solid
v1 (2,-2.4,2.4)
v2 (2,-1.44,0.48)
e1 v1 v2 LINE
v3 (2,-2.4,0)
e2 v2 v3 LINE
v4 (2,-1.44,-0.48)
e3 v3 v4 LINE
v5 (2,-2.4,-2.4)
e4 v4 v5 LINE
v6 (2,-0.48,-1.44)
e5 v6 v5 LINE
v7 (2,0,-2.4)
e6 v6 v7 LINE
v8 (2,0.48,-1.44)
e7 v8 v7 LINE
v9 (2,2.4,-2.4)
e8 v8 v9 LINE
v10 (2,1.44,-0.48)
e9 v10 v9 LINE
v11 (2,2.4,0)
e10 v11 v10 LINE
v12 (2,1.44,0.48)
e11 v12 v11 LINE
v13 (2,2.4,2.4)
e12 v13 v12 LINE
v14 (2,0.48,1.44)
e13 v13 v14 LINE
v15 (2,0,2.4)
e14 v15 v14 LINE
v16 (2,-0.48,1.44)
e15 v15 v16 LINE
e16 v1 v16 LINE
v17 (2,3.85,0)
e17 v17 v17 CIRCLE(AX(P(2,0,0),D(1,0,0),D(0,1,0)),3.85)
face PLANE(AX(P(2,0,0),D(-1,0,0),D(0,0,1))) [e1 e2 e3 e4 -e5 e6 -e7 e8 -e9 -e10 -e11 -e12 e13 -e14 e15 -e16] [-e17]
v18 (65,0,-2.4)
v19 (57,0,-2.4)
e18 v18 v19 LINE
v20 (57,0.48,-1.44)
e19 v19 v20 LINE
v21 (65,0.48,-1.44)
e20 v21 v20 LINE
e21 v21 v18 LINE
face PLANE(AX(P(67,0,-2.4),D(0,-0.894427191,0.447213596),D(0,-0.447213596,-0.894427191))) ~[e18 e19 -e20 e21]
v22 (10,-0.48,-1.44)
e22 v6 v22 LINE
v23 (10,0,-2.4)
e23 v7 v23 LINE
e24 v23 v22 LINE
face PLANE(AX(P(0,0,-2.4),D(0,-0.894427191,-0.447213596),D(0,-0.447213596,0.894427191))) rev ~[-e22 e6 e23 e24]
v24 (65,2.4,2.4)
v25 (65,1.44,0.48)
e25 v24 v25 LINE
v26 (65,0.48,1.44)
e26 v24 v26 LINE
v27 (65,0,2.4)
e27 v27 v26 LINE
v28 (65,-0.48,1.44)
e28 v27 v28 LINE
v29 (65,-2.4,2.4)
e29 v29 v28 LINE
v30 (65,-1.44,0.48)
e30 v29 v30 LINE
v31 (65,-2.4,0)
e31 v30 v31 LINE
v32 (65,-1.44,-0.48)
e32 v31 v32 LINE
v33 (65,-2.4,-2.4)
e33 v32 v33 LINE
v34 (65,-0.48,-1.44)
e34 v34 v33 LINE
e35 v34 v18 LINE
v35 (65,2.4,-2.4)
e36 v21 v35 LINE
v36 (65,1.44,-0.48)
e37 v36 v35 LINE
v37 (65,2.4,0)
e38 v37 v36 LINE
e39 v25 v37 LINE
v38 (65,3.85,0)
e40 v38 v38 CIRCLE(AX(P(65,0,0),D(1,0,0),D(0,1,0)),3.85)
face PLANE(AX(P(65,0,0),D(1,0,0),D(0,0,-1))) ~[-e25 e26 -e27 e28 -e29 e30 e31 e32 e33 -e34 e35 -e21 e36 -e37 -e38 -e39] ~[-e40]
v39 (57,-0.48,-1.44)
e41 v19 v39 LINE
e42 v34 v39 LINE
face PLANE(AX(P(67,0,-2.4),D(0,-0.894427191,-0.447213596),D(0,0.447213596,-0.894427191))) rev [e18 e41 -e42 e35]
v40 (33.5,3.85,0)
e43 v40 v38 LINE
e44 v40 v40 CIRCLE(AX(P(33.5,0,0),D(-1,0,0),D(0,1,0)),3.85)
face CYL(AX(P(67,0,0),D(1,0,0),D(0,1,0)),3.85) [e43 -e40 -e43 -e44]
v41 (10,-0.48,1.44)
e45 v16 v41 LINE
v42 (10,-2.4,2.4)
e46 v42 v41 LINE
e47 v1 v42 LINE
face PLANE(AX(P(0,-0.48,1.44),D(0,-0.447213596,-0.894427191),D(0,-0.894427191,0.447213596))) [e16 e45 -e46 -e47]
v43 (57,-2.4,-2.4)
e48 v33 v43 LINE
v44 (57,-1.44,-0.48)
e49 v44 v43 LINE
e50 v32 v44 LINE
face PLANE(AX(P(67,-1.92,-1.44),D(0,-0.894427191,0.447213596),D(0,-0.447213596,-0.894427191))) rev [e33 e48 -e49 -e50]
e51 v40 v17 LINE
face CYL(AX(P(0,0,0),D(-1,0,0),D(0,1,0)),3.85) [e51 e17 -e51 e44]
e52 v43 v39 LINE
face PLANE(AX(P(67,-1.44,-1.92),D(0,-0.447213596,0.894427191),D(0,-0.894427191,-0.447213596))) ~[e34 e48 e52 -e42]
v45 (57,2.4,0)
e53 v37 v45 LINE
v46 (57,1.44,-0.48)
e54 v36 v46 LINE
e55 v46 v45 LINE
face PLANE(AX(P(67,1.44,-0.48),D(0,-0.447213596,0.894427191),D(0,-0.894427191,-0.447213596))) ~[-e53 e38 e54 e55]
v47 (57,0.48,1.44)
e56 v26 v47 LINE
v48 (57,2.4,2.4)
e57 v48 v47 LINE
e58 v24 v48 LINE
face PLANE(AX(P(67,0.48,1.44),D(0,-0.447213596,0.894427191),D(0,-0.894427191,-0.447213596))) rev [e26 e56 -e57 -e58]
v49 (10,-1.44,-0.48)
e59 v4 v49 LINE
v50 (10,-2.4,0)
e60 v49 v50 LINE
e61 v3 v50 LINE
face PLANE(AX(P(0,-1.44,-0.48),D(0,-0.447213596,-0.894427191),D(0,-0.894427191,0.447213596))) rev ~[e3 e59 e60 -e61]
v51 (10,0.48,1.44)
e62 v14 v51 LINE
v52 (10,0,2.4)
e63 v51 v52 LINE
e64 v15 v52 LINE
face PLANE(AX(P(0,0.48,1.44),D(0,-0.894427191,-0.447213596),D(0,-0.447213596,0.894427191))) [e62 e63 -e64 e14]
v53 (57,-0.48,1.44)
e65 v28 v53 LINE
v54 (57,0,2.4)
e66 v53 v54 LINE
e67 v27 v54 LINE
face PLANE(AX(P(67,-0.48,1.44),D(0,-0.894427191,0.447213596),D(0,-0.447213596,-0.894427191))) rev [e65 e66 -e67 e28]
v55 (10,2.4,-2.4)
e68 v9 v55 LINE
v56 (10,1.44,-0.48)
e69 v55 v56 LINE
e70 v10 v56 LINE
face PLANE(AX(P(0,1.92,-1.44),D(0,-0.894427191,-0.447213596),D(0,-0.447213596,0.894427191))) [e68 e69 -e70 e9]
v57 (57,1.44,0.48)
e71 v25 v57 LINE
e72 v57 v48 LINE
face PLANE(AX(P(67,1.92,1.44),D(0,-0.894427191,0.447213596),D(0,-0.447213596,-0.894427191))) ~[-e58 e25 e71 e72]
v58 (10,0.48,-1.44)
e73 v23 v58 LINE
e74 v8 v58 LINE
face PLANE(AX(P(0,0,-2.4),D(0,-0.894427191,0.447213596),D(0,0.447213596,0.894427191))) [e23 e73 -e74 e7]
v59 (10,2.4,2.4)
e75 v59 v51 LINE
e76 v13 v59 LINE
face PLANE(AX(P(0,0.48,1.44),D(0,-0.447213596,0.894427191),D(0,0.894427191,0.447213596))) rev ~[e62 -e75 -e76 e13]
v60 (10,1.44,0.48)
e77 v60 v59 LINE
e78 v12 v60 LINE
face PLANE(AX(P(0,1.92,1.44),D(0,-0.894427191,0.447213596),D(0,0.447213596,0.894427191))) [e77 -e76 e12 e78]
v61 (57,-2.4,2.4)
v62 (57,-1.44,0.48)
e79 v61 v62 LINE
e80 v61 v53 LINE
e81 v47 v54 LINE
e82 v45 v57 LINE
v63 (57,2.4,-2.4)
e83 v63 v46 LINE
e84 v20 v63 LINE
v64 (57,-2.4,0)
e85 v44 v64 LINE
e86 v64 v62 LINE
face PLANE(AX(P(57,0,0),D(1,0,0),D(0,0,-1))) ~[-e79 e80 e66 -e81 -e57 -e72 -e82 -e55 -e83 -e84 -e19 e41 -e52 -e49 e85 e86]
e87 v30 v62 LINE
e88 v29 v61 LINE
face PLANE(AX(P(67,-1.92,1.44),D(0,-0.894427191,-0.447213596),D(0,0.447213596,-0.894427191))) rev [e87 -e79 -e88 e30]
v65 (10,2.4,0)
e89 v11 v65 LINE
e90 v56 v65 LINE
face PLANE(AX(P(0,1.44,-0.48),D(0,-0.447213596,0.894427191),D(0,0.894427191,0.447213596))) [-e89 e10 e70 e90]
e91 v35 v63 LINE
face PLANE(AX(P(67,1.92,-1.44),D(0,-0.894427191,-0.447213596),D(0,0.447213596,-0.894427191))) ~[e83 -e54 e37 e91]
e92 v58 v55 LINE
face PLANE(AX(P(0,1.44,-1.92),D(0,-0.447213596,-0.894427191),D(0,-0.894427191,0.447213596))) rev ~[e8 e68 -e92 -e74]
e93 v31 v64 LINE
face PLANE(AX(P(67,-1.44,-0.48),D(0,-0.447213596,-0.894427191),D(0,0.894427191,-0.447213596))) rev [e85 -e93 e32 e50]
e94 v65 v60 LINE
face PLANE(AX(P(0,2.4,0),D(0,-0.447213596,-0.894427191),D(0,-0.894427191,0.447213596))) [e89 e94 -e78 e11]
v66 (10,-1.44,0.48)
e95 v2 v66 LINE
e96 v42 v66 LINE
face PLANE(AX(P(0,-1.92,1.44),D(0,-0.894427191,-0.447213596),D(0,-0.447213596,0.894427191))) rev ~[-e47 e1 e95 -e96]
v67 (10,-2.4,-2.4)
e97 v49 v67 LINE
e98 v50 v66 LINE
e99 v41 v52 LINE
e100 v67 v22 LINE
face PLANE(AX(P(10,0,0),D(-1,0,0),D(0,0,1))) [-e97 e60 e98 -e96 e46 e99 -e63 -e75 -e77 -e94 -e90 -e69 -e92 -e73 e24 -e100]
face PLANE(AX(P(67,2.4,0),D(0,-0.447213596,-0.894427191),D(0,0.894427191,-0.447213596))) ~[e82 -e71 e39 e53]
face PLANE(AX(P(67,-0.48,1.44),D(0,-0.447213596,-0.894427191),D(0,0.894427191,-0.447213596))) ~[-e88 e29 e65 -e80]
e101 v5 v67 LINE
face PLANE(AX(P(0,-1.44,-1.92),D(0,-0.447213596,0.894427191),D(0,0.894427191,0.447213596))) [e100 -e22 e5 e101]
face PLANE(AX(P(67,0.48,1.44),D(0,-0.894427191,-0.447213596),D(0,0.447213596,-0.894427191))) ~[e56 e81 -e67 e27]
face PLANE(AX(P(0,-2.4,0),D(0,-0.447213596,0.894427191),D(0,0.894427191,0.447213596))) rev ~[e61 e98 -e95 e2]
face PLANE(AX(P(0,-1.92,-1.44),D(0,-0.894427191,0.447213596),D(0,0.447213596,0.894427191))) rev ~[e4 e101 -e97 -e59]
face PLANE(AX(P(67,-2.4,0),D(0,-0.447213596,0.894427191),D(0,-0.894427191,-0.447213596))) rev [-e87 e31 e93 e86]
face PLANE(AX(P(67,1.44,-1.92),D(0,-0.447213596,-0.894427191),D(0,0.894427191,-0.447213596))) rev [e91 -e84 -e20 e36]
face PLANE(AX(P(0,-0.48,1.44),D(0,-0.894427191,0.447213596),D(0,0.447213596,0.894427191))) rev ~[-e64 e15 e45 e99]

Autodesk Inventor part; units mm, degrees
ref_plane "YZ Plane" through (0, 0, 0) normal (1, 0, 0) x (0, 1, 0)
ref_plane "XZ Plane" through (0, 0, 0) normal (0, 1, 0) x (-1, 0, 0)
ref_plane "XY Plane" through (0, 0, 0) normal (0, 0, 1) x (1, 0, 0)
sketch "Sketch1" plane through (0, 0, 0) normal (1, 0, 0) x (0, 1, 0)
  circle A0 centre (0, 0) radius 3.85
  dimension "d0" = 7.7
extrude "Extrusion1" add sketch "Sketch1" along normal blind 5
sketch "Sketch2" plane through (5, 0, 0) normal (1, 0, 0) x (0, 0, -1)
  circle A0 centre (0, 0) radius 3.85
  dimension "d3" = 7.7
extrude "Extrusion2" add sketch "Sketch2" along normal blind 28.5
sketch "Sketch5" plane through (0, 0, 0) normal (-1, 0, 0) x (0, 0, 1)
  circle A0 centre (0, 0) radius 2.4
  line L0 (0, 0) -> (-2.4, 0)
  line L1 (-2.4, 0) -> (-2.4, 2.4)
  line L2 (-2.4, 2.4) -> (0, 2.4)
  line L3 (0, 2.4) -> (0, 0)
  line L4 (-2.4, 2.4) -> (2.4, 2.4)
  line L5 (2.4, 2.4) -> (2.4, -2.4)
  line L6 (2.4, -2.4) -> (-2.4, -2.4)
  line L7 (-2.4, -2.4) -> (-2.4, 2.4)
  line L8 (-2.4, 2.4) -> (2.4, 0)
  line L9 (-2.4, -2.4) -> (2.4, 0)
  line L10 (-2.4, 0) -> (2.4, 2.4)
  line L11 (-2.4, 0) -> (2.4, -2.4)
  line L12 (0, 2.4) -> (2.4, -2.4)
  line L13 (-2.4, -2.4) -> (0, 2.4)
  line L14 (-2.4, 2.4) -> (0, -2.4)
  line L15 (0, -2.4) -> (2.4, 2.4)
  point P0 (1.44, -0.48)
  point P1 (1.44, 0.48)
  point P2 (0.48, 1.44)
  point P3 (-0.48, 1.44)
  point P4 (-1.44, 0.48)
  point P5 (-1.44, -0.48)
  point P6 (-0.48, -1.44)
  point P7 (0.48, -1.44)
  dimension "d23" = 4.8
extrude "Extrusion5" cut sketch "Sketch5" against normal blind 10 contours L9 L12 L15 L8 | L15 L8 L12 L10 A0 | A0 L10 L15 | L12 L11 A0 | A0 L11 L15 L9 L12 | L15 L12 L8 | L9 L15 L12 | L12 L10 L3 | L3 L8 L13 | L14 L9 L11 L15 | L12 L15 L9 L11 L14 L0 L3 L8 | L8 L10 L12 | L15 L11 L9 | L8 L13 L10 L14 A0 | A0 L14 L8 | L10 L13 L8 | L3 L0 L13 L10 | L9 L13 A0 | A0 L13 L11 L14 L9 | L14 L11 L9 | L10 L14 L0 | L0 L13 L11 | L13 L14 L10 | L11 L13 L14
sketch "Sketch7" plane through (0, 0, 0) normal (-1, 0, 0) x (0, 0, 1)
  circle A0 centre (0, 0) radius 3.85
extrude "Extrusion7" cut sketch "Sketch7" against normal blind 2
mirror "Mirror1" about plane through (33.5, 0, 0) normal (1, 0, 0)
properties part number "gear_shaft"
